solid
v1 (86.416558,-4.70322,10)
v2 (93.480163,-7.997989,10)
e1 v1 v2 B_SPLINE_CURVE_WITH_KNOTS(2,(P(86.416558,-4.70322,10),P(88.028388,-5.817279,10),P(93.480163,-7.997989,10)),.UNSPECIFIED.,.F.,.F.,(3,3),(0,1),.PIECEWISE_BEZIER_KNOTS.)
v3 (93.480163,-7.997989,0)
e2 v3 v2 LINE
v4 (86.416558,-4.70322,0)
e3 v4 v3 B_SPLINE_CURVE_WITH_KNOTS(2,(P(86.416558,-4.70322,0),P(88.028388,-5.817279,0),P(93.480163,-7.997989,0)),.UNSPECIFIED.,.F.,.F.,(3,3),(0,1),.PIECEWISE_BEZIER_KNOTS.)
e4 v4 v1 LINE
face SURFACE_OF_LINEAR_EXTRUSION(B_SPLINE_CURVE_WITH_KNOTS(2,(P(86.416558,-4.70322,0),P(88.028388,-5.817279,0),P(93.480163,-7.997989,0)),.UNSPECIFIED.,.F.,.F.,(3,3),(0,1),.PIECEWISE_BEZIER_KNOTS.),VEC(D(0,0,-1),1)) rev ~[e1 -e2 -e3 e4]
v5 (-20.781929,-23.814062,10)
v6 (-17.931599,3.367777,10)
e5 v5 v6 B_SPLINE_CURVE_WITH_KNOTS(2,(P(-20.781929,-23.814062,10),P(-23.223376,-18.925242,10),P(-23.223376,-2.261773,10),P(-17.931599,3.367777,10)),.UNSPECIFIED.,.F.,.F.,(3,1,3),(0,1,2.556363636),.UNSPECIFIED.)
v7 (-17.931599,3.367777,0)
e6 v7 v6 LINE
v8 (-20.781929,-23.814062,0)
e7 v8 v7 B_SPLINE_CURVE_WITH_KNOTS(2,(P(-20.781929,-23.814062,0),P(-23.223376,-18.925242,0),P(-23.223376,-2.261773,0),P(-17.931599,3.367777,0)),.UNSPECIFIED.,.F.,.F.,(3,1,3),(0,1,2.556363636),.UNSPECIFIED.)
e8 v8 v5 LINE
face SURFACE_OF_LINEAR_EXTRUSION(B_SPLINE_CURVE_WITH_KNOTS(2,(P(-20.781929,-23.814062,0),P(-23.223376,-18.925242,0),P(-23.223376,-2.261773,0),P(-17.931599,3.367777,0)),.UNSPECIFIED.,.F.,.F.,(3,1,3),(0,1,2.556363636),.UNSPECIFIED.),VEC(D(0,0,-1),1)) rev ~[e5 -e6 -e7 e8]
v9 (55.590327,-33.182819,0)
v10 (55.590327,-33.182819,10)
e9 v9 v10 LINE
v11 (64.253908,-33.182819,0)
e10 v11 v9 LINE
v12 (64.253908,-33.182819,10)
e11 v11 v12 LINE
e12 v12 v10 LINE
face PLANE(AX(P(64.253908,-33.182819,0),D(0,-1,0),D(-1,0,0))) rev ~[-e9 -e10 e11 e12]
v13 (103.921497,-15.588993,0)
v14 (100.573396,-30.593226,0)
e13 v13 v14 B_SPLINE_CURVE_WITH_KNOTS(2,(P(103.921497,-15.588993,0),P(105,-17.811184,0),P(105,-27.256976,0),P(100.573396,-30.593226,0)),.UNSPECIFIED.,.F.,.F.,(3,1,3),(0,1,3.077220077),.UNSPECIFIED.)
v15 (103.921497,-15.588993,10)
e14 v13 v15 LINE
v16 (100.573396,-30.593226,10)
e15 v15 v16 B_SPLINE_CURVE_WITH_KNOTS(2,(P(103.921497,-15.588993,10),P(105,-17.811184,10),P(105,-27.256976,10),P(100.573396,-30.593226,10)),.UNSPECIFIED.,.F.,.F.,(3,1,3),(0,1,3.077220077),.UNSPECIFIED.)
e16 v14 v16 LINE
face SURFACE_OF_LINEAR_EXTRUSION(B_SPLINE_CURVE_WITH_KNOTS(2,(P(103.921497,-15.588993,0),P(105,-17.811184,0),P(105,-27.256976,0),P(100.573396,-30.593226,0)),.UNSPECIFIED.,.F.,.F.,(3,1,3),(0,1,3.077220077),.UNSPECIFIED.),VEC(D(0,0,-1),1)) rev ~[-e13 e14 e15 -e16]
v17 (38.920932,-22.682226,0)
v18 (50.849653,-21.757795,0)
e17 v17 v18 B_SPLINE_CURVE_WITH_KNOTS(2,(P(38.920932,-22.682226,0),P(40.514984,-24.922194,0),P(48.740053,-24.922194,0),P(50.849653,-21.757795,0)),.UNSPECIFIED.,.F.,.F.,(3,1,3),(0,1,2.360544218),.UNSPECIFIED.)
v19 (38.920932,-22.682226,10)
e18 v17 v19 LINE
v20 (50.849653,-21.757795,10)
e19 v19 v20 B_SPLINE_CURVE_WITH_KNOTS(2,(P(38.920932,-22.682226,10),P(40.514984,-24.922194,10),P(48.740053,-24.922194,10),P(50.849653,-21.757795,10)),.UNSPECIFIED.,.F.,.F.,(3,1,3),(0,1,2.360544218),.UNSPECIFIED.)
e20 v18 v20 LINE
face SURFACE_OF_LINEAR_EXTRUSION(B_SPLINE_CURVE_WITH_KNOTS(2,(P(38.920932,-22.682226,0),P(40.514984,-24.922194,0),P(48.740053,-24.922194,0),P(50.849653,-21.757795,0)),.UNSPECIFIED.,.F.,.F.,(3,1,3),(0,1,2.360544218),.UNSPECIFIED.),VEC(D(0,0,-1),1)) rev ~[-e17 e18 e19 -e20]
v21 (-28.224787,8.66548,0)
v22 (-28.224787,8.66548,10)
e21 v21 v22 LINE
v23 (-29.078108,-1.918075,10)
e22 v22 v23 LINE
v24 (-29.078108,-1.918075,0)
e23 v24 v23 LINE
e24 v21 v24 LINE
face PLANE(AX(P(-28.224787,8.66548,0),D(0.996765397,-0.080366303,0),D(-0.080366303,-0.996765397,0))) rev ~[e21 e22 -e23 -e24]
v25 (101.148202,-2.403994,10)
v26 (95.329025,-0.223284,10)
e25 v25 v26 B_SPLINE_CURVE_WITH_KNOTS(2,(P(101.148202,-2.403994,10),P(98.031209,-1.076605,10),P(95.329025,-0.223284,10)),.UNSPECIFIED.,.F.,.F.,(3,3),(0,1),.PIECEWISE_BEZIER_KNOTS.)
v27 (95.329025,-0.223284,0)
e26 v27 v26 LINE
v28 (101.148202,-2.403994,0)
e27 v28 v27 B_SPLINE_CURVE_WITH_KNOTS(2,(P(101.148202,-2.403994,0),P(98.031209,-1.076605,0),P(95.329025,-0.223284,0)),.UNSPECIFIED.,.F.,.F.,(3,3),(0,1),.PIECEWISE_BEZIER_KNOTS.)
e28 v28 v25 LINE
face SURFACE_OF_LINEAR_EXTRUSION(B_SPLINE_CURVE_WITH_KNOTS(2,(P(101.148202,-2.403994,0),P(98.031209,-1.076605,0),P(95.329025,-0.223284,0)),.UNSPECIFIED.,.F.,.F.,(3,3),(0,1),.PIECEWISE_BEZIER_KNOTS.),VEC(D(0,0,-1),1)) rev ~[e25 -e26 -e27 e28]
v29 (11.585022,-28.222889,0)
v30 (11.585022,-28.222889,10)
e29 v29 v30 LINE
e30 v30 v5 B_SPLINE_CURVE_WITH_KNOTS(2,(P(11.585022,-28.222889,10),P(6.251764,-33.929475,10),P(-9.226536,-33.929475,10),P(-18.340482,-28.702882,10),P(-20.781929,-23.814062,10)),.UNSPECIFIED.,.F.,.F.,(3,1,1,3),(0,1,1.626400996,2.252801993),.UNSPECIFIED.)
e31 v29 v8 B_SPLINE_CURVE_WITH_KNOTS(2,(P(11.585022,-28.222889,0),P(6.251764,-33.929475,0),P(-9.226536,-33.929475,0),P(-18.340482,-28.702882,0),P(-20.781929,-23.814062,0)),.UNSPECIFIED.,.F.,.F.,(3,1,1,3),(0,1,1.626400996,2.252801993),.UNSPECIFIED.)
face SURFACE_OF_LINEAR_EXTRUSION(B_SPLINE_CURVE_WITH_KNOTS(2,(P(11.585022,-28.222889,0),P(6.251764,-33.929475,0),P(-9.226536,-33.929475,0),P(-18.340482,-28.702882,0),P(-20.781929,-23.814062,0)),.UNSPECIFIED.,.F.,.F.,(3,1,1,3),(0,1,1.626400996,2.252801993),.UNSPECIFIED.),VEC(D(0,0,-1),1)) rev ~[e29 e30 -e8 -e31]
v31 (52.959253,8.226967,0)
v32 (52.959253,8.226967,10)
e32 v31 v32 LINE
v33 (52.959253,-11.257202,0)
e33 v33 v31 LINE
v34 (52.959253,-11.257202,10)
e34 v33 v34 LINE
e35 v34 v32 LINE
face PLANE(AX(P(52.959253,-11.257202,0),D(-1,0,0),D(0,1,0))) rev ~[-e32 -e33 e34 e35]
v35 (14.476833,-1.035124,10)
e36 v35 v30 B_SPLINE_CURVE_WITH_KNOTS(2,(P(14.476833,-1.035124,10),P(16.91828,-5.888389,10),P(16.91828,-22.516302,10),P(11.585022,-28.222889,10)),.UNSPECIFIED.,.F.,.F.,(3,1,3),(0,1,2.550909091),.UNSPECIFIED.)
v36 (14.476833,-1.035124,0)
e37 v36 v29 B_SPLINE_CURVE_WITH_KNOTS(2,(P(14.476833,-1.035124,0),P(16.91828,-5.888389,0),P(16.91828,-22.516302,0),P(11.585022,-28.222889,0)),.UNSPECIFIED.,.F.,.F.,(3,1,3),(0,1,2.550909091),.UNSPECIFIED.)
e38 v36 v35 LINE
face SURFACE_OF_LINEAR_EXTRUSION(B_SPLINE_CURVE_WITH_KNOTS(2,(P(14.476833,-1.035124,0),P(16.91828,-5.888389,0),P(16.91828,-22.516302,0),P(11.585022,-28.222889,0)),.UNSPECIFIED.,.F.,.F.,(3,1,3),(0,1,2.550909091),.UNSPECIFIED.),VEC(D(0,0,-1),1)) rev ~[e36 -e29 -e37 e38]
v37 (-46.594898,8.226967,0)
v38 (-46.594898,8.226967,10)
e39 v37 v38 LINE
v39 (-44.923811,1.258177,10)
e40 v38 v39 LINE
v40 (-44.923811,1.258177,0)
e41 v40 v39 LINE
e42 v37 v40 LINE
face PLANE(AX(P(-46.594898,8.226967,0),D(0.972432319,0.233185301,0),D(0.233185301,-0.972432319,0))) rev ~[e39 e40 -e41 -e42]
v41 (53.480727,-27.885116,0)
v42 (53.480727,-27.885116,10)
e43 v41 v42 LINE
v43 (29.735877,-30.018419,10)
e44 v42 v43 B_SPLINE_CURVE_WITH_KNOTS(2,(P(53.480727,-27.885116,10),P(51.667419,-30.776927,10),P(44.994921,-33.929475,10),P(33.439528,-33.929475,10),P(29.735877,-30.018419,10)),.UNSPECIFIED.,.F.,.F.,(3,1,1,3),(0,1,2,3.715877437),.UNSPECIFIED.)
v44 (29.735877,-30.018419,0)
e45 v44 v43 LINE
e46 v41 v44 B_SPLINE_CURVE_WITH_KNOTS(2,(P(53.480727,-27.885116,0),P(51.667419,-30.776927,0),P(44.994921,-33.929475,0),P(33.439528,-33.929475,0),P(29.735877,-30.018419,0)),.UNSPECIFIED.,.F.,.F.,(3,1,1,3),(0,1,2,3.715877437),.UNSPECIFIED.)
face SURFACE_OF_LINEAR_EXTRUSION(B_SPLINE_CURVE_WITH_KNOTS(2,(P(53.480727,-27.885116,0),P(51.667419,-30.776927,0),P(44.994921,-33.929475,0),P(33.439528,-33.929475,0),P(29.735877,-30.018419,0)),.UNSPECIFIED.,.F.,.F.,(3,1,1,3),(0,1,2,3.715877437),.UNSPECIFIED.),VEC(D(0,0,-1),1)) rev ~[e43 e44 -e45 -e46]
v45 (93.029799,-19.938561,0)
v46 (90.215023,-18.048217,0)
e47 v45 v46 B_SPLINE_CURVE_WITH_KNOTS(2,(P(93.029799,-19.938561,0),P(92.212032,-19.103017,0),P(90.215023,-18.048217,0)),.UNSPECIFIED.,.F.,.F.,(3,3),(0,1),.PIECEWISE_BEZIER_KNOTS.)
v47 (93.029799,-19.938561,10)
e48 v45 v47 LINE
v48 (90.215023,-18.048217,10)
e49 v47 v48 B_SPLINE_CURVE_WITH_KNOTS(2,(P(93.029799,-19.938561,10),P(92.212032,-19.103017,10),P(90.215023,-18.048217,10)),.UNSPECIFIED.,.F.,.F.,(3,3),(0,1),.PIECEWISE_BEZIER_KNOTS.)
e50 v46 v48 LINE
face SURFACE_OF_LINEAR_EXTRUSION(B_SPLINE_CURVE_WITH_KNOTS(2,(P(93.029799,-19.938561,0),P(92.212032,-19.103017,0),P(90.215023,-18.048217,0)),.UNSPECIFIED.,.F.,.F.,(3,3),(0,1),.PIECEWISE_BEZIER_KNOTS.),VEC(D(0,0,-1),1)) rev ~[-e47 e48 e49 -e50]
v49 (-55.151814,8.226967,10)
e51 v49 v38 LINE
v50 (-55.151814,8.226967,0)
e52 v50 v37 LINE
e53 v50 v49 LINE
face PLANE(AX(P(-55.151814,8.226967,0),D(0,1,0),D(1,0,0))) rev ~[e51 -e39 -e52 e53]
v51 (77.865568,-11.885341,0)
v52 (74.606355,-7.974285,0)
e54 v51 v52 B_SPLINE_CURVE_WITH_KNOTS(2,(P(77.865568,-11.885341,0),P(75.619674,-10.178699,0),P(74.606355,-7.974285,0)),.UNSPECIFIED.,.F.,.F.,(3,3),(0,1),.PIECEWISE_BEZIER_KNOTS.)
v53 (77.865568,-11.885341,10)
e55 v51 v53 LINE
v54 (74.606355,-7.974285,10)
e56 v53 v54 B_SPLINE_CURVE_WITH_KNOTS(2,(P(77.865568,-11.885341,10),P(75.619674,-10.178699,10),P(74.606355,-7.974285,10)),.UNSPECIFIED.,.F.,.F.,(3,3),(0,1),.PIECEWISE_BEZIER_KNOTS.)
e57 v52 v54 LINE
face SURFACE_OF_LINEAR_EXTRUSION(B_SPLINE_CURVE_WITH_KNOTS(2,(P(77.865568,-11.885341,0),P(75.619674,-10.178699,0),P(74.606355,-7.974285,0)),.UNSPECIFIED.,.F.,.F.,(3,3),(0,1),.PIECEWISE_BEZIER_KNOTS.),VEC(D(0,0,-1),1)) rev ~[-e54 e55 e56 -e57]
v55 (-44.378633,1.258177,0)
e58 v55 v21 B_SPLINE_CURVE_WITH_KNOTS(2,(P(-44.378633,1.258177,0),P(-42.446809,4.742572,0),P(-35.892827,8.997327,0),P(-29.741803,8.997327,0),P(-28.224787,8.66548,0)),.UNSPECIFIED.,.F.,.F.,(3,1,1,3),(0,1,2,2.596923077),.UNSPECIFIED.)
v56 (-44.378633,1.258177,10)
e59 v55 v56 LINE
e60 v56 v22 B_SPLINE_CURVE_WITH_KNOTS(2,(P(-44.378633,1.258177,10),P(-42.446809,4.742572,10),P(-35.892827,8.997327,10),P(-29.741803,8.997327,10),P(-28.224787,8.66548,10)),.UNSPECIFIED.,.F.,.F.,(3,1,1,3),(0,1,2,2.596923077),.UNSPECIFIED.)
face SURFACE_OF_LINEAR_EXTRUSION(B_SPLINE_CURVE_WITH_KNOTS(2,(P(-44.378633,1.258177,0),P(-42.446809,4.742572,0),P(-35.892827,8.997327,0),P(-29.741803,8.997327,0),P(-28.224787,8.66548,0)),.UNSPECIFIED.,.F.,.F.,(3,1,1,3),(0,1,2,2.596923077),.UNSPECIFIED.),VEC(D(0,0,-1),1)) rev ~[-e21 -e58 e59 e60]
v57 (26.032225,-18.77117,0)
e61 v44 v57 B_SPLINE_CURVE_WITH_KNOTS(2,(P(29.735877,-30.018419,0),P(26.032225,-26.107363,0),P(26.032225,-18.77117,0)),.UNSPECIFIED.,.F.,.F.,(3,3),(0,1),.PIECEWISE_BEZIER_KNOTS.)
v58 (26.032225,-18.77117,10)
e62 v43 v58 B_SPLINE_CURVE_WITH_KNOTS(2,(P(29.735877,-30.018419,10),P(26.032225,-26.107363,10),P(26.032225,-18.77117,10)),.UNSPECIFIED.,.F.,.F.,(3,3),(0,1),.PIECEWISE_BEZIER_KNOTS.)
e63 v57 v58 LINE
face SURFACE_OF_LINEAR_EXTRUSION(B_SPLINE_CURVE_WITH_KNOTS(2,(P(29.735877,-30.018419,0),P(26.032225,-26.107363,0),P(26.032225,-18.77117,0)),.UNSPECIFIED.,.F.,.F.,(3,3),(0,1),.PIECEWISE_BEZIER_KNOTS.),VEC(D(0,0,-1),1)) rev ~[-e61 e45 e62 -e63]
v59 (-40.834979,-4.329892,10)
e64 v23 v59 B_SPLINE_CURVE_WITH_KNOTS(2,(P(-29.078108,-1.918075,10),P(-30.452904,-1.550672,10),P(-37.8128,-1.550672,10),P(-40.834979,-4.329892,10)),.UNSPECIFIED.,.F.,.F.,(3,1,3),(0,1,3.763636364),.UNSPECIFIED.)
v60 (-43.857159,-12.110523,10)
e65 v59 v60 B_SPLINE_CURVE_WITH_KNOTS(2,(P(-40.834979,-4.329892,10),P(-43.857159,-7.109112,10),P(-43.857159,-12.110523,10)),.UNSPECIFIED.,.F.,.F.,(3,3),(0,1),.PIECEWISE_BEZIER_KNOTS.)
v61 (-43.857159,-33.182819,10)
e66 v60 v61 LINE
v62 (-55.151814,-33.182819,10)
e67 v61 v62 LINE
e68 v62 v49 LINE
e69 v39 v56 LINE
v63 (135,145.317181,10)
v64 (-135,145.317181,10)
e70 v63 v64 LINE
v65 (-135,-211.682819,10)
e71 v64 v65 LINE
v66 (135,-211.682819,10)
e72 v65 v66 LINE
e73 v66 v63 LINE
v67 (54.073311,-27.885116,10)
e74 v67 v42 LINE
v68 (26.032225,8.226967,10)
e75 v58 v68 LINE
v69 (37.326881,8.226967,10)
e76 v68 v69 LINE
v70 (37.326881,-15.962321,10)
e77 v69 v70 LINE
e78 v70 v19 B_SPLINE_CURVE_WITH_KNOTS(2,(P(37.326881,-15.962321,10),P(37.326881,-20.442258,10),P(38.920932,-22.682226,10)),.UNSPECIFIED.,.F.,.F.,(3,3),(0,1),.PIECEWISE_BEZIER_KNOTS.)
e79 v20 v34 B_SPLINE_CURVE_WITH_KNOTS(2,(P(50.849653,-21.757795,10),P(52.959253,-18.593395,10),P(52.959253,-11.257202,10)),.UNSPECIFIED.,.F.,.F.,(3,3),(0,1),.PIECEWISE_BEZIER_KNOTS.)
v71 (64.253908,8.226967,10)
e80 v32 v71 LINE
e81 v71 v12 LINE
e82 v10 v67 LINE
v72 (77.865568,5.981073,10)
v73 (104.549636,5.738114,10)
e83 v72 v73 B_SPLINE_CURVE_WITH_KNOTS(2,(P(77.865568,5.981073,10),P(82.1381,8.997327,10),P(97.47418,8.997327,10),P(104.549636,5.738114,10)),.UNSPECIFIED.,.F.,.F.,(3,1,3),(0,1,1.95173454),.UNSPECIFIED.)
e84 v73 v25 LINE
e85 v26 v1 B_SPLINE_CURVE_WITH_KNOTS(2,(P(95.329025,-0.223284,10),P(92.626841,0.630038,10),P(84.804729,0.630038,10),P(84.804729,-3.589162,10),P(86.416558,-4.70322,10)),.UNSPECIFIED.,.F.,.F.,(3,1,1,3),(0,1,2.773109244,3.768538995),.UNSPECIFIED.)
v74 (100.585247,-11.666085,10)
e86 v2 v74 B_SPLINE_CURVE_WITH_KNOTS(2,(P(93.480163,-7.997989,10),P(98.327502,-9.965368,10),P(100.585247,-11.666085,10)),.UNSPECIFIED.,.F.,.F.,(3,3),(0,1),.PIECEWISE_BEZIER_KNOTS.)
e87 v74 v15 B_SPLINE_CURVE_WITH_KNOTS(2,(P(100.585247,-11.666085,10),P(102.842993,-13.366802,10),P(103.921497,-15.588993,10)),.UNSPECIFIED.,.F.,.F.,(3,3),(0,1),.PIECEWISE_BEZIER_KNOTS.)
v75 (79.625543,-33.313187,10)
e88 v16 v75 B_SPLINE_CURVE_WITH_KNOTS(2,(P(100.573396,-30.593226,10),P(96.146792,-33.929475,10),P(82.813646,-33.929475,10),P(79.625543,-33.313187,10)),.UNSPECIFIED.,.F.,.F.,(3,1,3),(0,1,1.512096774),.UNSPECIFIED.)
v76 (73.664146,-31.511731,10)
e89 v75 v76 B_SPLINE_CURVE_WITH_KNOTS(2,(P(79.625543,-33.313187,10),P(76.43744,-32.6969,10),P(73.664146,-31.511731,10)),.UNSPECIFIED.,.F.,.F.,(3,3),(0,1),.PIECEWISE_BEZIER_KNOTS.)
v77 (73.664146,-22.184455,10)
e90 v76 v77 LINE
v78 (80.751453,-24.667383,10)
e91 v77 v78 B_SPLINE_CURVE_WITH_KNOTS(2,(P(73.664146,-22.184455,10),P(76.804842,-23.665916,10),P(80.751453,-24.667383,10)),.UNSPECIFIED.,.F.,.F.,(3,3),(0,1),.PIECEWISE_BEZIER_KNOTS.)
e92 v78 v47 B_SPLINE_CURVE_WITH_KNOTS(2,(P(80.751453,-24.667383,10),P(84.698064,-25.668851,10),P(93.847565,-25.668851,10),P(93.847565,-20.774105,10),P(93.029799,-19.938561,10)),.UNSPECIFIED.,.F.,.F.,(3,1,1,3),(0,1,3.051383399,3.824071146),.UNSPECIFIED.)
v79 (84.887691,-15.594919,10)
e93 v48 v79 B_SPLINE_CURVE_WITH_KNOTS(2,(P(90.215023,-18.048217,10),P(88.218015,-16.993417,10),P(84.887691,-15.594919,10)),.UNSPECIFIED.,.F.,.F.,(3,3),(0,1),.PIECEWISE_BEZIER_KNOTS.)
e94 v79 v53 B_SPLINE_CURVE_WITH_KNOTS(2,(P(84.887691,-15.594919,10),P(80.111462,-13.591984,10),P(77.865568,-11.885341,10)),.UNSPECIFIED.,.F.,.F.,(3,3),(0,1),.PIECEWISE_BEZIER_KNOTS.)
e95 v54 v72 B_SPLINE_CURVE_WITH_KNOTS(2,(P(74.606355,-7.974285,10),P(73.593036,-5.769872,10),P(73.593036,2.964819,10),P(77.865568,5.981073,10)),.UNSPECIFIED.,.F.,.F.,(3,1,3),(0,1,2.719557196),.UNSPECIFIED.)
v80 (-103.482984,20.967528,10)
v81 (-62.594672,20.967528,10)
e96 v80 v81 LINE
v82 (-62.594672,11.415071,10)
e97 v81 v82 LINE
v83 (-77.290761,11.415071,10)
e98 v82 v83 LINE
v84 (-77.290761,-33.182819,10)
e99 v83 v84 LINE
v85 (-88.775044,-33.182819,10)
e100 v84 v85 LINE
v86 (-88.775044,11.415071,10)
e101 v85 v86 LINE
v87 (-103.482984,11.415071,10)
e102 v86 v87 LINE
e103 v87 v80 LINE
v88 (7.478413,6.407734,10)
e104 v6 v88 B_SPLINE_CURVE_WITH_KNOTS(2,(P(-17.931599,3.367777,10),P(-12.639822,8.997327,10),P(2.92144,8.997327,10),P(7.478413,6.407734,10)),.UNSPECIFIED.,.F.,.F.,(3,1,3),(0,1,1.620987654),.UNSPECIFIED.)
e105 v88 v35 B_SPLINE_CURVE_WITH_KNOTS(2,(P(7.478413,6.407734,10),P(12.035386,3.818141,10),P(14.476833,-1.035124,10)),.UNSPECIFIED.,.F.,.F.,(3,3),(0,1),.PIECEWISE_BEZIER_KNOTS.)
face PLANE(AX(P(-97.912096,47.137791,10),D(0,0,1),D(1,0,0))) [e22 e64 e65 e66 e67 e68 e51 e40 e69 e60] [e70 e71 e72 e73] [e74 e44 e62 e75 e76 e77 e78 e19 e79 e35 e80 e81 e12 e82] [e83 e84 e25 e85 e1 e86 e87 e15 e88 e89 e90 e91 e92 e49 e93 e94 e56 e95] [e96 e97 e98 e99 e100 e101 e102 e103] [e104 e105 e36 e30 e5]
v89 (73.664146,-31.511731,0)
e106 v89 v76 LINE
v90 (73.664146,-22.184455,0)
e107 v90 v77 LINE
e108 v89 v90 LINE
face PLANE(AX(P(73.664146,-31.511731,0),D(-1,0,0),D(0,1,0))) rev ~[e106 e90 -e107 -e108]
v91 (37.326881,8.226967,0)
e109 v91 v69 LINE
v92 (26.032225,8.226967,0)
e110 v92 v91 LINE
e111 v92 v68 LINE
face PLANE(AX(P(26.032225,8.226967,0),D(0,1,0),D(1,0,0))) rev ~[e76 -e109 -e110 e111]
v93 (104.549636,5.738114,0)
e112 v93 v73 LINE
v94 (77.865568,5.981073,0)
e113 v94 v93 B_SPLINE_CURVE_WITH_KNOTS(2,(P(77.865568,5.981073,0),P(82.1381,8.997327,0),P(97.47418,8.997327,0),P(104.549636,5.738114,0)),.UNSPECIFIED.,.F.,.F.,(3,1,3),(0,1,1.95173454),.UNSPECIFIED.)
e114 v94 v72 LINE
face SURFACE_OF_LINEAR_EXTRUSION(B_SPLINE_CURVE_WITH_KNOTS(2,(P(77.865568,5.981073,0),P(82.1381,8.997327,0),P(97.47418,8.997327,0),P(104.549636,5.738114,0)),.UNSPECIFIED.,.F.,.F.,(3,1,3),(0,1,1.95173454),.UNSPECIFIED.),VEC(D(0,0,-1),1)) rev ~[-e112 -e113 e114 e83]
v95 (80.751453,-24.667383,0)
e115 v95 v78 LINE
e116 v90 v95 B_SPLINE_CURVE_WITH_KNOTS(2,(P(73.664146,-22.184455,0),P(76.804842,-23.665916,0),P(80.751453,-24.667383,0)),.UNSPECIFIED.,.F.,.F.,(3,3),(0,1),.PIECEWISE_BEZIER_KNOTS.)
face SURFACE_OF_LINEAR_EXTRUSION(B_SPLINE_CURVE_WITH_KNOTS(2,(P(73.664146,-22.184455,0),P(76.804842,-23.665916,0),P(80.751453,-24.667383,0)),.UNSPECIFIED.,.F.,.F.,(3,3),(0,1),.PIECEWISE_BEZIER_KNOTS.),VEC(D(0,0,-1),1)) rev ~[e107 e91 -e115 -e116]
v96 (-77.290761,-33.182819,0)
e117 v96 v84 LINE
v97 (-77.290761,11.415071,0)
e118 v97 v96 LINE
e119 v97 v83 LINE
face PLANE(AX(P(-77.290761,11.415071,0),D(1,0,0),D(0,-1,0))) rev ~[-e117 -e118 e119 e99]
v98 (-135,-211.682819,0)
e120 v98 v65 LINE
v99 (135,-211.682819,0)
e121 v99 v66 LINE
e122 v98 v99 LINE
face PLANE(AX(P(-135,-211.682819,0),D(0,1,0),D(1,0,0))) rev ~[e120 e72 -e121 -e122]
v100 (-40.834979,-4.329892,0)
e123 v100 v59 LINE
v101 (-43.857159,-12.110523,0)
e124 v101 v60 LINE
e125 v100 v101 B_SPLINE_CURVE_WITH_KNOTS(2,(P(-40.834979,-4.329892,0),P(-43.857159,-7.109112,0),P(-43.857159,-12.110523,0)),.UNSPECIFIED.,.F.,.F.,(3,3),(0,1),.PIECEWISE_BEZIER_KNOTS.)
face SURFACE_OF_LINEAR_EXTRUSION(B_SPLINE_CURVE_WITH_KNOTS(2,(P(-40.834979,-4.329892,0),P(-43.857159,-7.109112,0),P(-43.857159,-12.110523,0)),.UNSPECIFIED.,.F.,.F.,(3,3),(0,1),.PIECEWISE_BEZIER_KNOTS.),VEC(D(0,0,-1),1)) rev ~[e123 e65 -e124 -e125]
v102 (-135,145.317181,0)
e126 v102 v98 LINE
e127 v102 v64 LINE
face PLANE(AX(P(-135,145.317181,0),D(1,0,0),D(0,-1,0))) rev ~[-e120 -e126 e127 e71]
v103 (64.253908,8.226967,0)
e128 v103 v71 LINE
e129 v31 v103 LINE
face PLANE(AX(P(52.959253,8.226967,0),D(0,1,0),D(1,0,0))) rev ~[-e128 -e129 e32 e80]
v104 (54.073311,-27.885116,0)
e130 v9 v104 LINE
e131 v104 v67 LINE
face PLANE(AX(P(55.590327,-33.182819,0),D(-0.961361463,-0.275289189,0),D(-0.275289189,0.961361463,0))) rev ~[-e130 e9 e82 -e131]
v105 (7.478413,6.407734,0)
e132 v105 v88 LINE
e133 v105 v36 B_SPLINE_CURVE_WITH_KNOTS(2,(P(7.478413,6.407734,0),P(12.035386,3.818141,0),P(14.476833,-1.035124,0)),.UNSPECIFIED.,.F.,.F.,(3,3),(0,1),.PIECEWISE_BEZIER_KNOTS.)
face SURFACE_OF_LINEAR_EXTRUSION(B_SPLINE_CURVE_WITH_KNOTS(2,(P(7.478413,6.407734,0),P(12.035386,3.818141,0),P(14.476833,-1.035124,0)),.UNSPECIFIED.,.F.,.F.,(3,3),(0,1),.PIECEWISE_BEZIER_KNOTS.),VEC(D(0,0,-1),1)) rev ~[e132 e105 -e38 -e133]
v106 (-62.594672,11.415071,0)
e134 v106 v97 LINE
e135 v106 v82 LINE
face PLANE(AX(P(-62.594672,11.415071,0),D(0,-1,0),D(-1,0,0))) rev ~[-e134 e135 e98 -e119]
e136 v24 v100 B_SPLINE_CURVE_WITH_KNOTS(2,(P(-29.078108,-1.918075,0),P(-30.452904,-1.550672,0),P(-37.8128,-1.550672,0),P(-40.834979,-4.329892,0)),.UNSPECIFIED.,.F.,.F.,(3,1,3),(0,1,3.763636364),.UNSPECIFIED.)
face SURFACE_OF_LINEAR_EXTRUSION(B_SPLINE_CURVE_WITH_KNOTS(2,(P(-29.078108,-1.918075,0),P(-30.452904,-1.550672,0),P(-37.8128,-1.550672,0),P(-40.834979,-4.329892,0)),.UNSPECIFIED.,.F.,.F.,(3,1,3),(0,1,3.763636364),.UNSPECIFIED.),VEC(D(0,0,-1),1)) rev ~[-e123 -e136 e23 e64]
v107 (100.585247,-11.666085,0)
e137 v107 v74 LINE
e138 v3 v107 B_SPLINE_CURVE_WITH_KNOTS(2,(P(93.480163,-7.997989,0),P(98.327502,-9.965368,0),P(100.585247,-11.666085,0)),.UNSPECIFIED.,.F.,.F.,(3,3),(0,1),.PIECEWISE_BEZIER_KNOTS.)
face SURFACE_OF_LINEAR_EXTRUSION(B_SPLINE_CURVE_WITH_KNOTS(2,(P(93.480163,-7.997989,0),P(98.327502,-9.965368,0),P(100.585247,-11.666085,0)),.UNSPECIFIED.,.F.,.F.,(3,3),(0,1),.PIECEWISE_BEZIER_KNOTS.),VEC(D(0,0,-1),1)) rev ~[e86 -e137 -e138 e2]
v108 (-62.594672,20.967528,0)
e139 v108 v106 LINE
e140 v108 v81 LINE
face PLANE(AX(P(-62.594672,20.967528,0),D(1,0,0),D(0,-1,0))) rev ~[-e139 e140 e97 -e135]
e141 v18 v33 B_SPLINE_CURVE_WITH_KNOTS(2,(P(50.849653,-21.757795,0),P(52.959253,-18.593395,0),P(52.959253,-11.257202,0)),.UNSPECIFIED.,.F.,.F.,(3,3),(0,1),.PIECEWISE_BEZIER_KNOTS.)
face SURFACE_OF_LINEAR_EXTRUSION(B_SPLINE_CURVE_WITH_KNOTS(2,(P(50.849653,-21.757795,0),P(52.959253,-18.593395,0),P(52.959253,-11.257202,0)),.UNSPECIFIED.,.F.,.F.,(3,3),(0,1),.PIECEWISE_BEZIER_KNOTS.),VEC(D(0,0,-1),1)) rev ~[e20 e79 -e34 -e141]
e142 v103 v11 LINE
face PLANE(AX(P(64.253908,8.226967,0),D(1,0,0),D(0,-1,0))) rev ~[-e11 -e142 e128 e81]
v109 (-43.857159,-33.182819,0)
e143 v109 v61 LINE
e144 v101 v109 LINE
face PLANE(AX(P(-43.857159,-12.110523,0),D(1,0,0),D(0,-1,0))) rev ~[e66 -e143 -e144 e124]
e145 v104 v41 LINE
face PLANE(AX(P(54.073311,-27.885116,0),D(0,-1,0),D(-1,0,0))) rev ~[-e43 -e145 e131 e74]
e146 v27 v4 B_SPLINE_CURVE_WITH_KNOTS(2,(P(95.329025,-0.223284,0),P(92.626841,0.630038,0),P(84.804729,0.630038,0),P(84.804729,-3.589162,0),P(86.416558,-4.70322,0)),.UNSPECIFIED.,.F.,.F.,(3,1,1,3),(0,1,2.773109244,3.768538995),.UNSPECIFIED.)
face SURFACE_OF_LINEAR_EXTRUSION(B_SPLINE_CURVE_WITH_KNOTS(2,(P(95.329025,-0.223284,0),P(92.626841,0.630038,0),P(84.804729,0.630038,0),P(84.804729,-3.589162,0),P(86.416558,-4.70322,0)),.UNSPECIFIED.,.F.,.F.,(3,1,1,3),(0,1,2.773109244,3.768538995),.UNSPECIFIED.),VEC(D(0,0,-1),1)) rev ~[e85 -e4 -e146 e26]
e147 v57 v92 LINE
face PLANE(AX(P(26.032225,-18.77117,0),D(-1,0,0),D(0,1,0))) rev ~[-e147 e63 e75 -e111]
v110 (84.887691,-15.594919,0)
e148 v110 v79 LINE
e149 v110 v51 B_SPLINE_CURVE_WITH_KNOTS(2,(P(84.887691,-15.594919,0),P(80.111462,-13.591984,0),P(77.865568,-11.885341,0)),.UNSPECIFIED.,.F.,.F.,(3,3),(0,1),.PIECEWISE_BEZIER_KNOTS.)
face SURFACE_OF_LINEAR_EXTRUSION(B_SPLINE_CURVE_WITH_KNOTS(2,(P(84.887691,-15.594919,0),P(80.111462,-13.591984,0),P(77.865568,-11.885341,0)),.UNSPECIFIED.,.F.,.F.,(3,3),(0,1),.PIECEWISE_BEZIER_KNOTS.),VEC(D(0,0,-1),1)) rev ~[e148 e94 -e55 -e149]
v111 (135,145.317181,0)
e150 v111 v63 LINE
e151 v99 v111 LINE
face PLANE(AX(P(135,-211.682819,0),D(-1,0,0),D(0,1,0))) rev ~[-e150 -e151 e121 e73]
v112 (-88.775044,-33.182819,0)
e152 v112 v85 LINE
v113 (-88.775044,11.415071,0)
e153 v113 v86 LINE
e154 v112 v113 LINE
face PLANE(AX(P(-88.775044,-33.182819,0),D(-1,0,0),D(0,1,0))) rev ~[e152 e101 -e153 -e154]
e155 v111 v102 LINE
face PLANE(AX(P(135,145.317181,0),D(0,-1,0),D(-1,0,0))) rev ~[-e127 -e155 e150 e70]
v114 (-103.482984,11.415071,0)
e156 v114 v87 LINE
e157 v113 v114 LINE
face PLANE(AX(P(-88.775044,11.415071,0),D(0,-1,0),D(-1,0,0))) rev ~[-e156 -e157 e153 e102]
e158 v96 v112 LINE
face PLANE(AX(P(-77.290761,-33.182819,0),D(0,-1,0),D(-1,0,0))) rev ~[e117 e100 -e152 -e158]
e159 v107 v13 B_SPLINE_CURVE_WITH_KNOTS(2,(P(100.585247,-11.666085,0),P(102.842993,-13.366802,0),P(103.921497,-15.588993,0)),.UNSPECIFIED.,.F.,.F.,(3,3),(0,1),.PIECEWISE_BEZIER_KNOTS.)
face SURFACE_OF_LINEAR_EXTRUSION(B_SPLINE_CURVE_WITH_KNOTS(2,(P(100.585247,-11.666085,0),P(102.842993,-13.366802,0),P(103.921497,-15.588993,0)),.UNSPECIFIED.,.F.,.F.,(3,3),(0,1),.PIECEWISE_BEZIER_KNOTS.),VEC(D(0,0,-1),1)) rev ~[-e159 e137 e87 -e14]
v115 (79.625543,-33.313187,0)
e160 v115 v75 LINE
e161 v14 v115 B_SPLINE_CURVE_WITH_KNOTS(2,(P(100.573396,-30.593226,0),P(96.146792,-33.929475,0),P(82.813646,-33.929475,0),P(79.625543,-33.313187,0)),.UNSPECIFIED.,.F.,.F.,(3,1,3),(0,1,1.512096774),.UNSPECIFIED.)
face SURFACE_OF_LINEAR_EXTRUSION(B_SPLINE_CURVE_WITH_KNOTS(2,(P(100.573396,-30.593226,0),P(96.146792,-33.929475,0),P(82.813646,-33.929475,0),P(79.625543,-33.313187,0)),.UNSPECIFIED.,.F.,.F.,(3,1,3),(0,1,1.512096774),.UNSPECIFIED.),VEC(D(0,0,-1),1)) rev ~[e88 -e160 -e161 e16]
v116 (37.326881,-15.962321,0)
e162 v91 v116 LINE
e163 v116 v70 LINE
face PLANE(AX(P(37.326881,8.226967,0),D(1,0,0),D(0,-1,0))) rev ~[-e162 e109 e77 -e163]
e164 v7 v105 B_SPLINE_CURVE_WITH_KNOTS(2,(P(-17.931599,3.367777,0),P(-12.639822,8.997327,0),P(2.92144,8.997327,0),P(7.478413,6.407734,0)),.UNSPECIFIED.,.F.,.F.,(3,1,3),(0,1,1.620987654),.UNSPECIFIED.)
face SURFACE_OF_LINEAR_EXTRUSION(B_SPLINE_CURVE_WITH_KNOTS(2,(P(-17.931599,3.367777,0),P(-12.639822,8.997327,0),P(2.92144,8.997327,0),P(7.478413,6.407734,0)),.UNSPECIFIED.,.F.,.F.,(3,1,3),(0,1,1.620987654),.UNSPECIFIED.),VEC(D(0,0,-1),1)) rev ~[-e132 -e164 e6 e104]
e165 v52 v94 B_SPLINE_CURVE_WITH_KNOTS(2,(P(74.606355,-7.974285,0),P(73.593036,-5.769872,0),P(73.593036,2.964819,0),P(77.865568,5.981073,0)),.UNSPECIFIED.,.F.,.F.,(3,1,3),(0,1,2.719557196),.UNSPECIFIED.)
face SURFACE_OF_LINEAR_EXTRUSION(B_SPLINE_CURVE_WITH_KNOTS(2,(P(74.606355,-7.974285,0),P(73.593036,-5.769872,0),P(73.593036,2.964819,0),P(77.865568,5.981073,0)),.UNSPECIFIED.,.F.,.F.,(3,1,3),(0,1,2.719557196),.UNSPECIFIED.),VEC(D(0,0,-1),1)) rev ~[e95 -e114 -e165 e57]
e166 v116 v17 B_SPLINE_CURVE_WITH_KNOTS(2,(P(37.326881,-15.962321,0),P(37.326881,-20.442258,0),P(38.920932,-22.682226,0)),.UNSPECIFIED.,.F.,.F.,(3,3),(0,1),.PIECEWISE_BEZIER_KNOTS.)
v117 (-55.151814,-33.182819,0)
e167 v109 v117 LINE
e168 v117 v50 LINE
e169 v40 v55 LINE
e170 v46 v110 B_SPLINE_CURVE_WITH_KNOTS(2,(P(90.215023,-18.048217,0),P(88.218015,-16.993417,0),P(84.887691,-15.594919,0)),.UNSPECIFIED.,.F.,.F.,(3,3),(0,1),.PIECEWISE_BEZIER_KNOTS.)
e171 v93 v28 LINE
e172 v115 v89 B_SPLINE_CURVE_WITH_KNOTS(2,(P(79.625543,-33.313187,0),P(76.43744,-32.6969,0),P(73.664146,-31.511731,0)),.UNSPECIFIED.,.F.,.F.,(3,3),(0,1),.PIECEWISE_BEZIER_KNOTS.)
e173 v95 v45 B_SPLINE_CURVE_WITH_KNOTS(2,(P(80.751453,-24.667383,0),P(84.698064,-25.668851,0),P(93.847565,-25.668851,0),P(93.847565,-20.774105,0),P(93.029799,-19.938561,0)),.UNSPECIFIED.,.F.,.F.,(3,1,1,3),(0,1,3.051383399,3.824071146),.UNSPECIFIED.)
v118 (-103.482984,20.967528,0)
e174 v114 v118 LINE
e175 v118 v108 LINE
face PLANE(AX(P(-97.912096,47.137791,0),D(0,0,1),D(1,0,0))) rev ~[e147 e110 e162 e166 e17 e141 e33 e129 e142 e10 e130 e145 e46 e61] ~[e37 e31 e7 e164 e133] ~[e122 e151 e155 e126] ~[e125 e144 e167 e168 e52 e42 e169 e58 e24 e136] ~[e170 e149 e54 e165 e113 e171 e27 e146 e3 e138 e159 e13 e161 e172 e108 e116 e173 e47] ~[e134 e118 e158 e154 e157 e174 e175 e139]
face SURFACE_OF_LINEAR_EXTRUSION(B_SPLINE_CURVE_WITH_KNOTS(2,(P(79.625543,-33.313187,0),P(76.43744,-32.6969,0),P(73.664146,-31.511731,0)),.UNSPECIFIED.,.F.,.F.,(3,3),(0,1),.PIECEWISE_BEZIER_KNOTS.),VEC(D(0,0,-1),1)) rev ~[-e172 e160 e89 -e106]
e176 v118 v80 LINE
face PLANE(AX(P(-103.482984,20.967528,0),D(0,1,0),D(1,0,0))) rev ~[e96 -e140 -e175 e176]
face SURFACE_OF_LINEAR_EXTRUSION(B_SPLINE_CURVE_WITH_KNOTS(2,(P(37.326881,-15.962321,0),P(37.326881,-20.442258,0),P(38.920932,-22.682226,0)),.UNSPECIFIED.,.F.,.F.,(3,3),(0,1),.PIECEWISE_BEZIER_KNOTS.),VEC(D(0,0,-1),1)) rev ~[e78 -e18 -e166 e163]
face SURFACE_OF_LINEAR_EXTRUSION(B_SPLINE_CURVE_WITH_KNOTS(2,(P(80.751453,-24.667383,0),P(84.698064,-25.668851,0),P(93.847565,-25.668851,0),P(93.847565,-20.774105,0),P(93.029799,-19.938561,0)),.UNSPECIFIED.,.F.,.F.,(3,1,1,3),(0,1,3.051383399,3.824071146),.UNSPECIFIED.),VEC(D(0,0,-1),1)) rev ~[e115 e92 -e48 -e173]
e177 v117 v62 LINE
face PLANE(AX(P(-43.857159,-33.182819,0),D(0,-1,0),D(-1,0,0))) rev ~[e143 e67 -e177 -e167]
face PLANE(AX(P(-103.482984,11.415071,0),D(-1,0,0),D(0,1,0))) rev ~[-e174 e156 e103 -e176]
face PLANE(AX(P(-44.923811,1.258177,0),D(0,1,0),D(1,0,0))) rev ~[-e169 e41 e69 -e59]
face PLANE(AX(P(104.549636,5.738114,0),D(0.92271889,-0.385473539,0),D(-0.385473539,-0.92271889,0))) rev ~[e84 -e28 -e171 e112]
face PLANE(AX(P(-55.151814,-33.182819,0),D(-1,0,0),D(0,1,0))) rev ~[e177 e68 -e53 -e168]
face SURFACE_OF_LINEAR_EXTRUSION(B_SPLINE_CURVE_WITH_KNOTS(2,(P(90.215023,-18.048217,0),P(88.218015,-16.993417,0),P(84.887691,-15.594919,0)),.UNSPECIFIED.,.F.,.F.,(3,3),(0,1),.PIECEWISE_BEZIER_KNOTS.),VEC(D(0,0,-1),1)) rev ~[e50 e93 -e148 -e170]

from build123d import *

# Parameters (mm, degrees)
F1_DEPTH = 10


# Not quite as in the source:
# - a feature names something its author has since deleted; it is built from what else it names


with BuildPart() as f1:
    # F0 (on Top) → F1 (new body)
    with BuildSketch(Plane.XY):
        Polygon((-135, 145.3171813515), (-135, -111.8657903795), (-105, -111.8657903795), (-105, 115.3171813515), (0, 115.3171813515), (0, 145.3171813515), align=None)
        Polygon((81.1492523154, -181.6828186485), (81.1492523154, -211.6828186485), (135, -211.6828186485), (135, -33.1828186485), (105, -33.1828186485), (105, -181.6828186485), align=None)
        Polygon((105, -33.1828186485), (135, -33.1828186485), (135, 145.3171813515), (0, 145.3171813515), (0, 115.3171813515), (105, 115.3171813515), (105, -20.8807700001), align=None)
        Polygon((-135, -111.8657903795), (-135, -211.6828186485), (81.1492523154, -211.6828186485), (81.1492523154, -181.6828186485), (-105, -181.6828186485), (-105, -111.8657903795), align=None)
        Polygon((-105, -181.6828186485), (81.1492523154, -181.6828186485), (105, -181.6828186485), (105, -33.1828186485), (105, -20.8807700001), (105, 115.3171813515), (0, 115.3171813515), (-105, 115.3171813515), (-105, -111.8657903795), align=None)
        Polygon((-77.2907613296, 11.4150706229), (-77.2907613296, -33.1828186485), (-88.7750437384, -33.1828186485), (-88.7750437384, 11.4150706229), (-103.4829843671, 11.4150706229), (-103.4829843671, 20.9675284366), (-62.5946723856, 20.9675284366), (-62.5946723856, 11.4150706229), align=None, mode=Mode.SUBTRACT)
        with BuildLine():
            add(Edge.make_bspline(
                [(-39.1698177098, 6.8699495664), (-35.892826909, 8.9973269579), (-32.0410294035, 8.9973269579)],
                knots=[0, 0, 0, 1, 1, 1], degree=2))
            add(Edge.make_bspline(
                [(-32.0410294035, 8.9973269579), (-29.7418025848, 8.9973269579), (-28.2247869519, 8.6654797882)],
                knots=[0, 0, 0, 1, 1, 1], degree=2))
            Line((-28.2247869519, 8.6654797882), (-29.0781082454, -1.9180745884))
            add(Edge.make_bspline(
                [(-29.0781082454, -1.9180745884), (-30.4529036627, -1.5506723648), (-32.4084316271, -1.5506723648)],
                knots=[0, 0, 0, 1, 1, 1], degree=2))
            add(Edge.make_bspline(
                [(-32.4084316271, -1.5506723648), (-37.8127998194, -1.5506723648), (-40.8349794006, -4.3298924111)],
                knots=[0, 0, 0, 1, 1, 1], degree=2))
            add(Edge.make_bspline(
                [(-40.8349794006, -4.3298924111), (-43.8571589819, -7.1091124574), (-43.8571589819, -12.1105233722)],
                knots=[0, 0, 0, 1, 1, 1], degree=2))
            Line((-43.8571589819, -12.1105233722), (-43.8571589819, -33.1828186485))
            Line((-43.8571589819, -33.1828186485), (-55.1518144365, -33.1828186485))
            Line((-55.1518144365, -33.1828186485), (-55.1518144365, 8.2269674568))
            Line((-55.1518144365, 8.2269674568), (-46.5948981319, 8.2269674568))
            Line((-46.5948981319, 8.2269674568), (-44.9238105988, 1.258176893))
            Line((-44.9238105988, 1.258176893), (-44.3786331057, 1.258176893))
            add(Edge.make_bspline(
                [(-44.3786331057, 1.258176893), (-42.4468085106, 4.7425721749), (-39.1698177098, 6.8699495664)],
                knots=[0, 0, 0, 1, 1, 1], degree=2))
        make_face(mode=Mode.SUBTRACT)
        with BuildLine():
            add(Edge.make_bspline(
                [(14.4768327784, -1.0351240833), (16.9182798126, -5.8883889403), (16.9182798126, -12.406815488)],
                knots=[0, 0, 0, 1, 1, 1], degree=2))
            add(Edge.make_bspline(
                [(16.9182798126, -12.406815488), (16.9182798126, -22.5163024794), (11.5850217281, -28.2228886299)],
                knots=[0, 0, 0, 1, 1, 1], degree=2))
            add(Edge.make_bspline(
                [(11.5850217281, -28.2228886299), (6.2517636435, -33.9294747803), (-3.2651391162, -33.9294747803)],
                knots=[0, 0, 0, 1, 1, 1], degree=2))
            add(Edge.make_bspline(
                [(-3.2651391162, -33.9294747803), (-9.2265364863, -33.9294747803), (-13.7835092274, -31.3161783189)],
                knots=[0, 0, 0, 1, 1, 1], degree=2))
            add(Edge.make_bspline(
                [(-13.7835092274, -31.3161783189), (-18.3404819685, -28.7028818575), (-20.7819290028, -23.8140619466)],
                knots=[0, 0, 0, 1, 1, 1], degree=2))
            add(Edge.make_bspline(
                [(-20.7819290028, -23.8140619466), (-23.223376037, -18.9252420358), (-23.223376037, -12.406815488)],
                knots=[0, 0, 0, 1, 1, 1], degree=2))
            add(Edge.make_bspline(
                [(-23.223376037, -12.406815488), (-23.223376037, -2.2617734428), (-17.9315988487, 3.3677767576)],
                knots=[0, 0, 0, 1, 1, 1], degree=2))
            add(Edge.make_bspline(
                [(-17.9315988487, 3.3677767576), (-12.6398216604, 8.9973269579), (-3.0399571082, 8.9973269579)],
                knots=[0, 0, 0, 1, 1, 1], degree=2))
            add(Edge.make_bspline(
                [(-3.0399571082, 8.9973269579), (2.9214402619, 8.9973269579), (7.478413003, 6.4077338658)],
                knots=[0, 0, 0, 1, 1, 1], degree=2))
            add(Edge.make_bspline(
                [(7.478413003, 6.4077338658), (12.0353857441, 3.8181407736), (14.4768327784, -1.0351240833)],
                knots=[0, 0, 0, 1, 1, 1], degree=2))
        make_face(mode=Mode.SUBTRACT)
        with BuildLine():
            Line((64.2539082341, -33.1828186485), (55.5903267679, -33.1828186485))
            Line((55.5903267679, -33.1828186485), (54.0733111349, -27.8851156178))
            Line((54.0733111349, -27.8851156178), (53.4807269033, -27.8851156178))
            add(Edge.make_bspline(
                [(53.4807269033, -27.8851156178), (51.6674191546, -30.7769266681), (48.3311699306, -32.3532007242)],
                knots=[0, 0, 0, 1, 1, 1], degree=2))
            add(Edge.make_bspline(
                [(48.3311699306, -32.3532007242), (44.9949207066, -33.9294747803), (40.7401659236, -33.9294747803)],
                knots=[0, 0, 0, 1, 1, 1], degree=2))
            add(Edge.make_bspline(
                [(40.7401659236, -33.9294747803), (33.4395281901, -33.9294747803), (29.7358767425, -30.0184188517)],
                knots=[0, 0, 0, 1, 1, 1], degree=2))
            add(Edge.make_bspline(
                [(29.7358767425, -30.0184188517), (26.0322252949, -26.107362923), (26.0322252949, -18.7711701356)],
                knots=[0, 0, 0, 1, 1, 1], degree=2))
            Line((26.0322252949, -18.7711701356), (26.0322252949, 8.2269674568))
            Line((26.0322252949, 8.2269674568), (37.3268807495, 8.2269674568))
            Line((37.3268807495, 8.2269674568), (37.3268807495, -15.9623208777))
            add(Edge.make_bspline(
                [(37.3268807495, -15.9623208777), (37.3268807495, -20.4422576688), (38.9209323325, -22.6822260643)],
                knots=[0, 0, 0, 1, 1, 1], degree=2))
            add(Edge.make_bspline(
                [(38.9209323325, -22.6822260643), (40.5149839156, -24.9221944598), (43.9993791975, -24.9221944598)],
                knots=[0, 0, 0, 1, 1, 1], degree=2))
            add(Edge.make_bspline(
                [(43.9993791975, -24.9221944598), (48.7400530504, -24.9221944598), (50.8496529149, -21.7577946629)],
                knots=[0, 0, 0, 1, 1, 1], degree=2))
            add(Edge.make_bspline(
                [(50.8496529149, -21.7577946629), (52.9592527795, -18.5933948661), (52.9592527795, -11.2572020787)],
                knots=[0, 0, 0, 1, 1, 1], degree=2))
            Line((52.9592527795, -11.2572020787), (52.9592527795, 8.2269674568))
            Line((52.9592527795, 8.2269674568), (64.2539082341, 8.2269674568))
            Line((64.2539082341, 8.2269674568), (64.2539082341, -33.1828186485))
        make_face(mode=Mode.SUBTRACT)
        with BuildLine():
            add(Edge.make_bspline(
                [(103.9214966985, -15.5889928118), (105, -17.8111836804), (105, -20.8807700001)],
                knots=[0, 0, 0, 1, 1, 1], degree=2))
            add(Edge.make_bspline(
                [(105, -20.8807700001), (105, -27.2569763323), (100.5733957898, -30.5932255563)],
                knots=[0, 0, 0, 1, 1, 1], degree=2))
            add(Edge.make_bspline(
                [(100.5733957898, -30.5932255563), (96.1467915797, -33.9294747803), (87.3291382132, -33.9294747803)],
                knots=[0, 0, 0, 1, 1, 1], degree=2))
            add(Edge.make_bspline(
                [(87.3291382132, -33.9294747803), (82.8136463683, -33.9294747803), (79.6255432022, -33.3131871794)],
                knots=[0, 0, 0, 1, 1, 1], degree=2))
            add(Edge.make_bspline(
                [(79.6255432022, -33.3131871794), (76.4374400361, -32.6968995786), (73.6641458322, -31.5117311153)],
                knots=[0, 0, 0, 1, 1, 1], degree=2))
            Line((73.6641458322, -31.5117311153), (73.6641458322, -22.1844553097))
            add(Edge.make_bspline(
                [(73.6641458322, -22.1844553097), (76.8048422597, -23.6659158887), (80.7514532423, -24.6673832402)],
                knots=[0, 0, 0, 1, 1, 1], degree=2))
            add(Edge.make_bspline(
                [(80.7514532423, -24.6673832402), (84.6980642248, -25.6688505916), (87.6965404368, -25.6688505916)],
                knots=[0, 0, 0, 1, 1, 1], degree=2))
            add(Edge.make_bspline(
                [(87.6965404368, -25.6688505916), (93.847564761, -25.6688505916), (93.847564761, -22.1133452019)],
                knots=[0, 0, 0, 1, 1, 1], degree=2))
            add(Edge.make_bspline(
                [(93.847564761, -22.1133452019), (93.847564761, -20.7741048385), (93.0297985214, -19.9385610719)],
                knots=[0, 0, 0, 1, 1, 1], degree=2))
            add(Edge.make_bspline(
                [(93.0297985214, -19.9385610719), (92.2120322817, -19.1030173053), (90.2150234212, -18.048217373)],
                knots=[0, 0, 0, 1, 1, 1], degree=2))
            add(Edge.make_bspline(
                [(90.2150234212, -18.048217373), (88.2180145606, -16.9934174408), (84.887691179, -15.5949186541)],
                knots=[0, 0, 0, 1, 1, 1], degree=2))
            add(Edge.make_bspline(
                [(84.887691179, -15.5949186541), (80.1114622721, -13.5919839513), (77.8655680343, -11.8853413642)],
                knots=[0, 0, 0, 1, 1, 1], degree=2))
            add(Edge.make_bspline(
                [(77.8655680343, -11.8853413642), (75.6196737965, -10.1786987772), (74.6063547604, -7.9742854356)],
                knots=[0, 0, 0, 1, 1, 1], degree=2))
            add(Edge.make_bspline(
                [(74.6063547604, -7.9742854356), (73.5930357244, -5.7698720939), (73.5930357244, -2.5580655586)],
                knots=[0, 0, 0, 1, 1, 1], degree=2))
            add(Edge.make_bspline(
                [(73.5930357244, -2.5580655586), (73.5930357244, 2.9648194801), (77.8655680343, 5.981073219)],
                knots=[0, 0, 0, 1, 1, 1], degree=2))
            add(Edge.make_bspline(
                [(77.8655680343, 5.981073219), (82.1381003443, 8.9973269579), (89.9957672555, 8.9973269579)],
                knots=[0, 0, 0, 1, 1, 1], degree=2))
            add(Edge.make_bspline(
                [(89.9957672555, 8.9973269579), (97.4741802585, 8.9973269579), (104.549635984, 5.738113684)],
                knots=[0, 0, 0, 1, 1, 1], degree=2))
            Line((104.549635984, 5.738113684), (101.1482024945, -2.4039936584))
            add(Edge.make_bspline(
                [(101.1482024945, -2.4039936584), (98.0312094362, -1.0766049796), (95.32902534, -0.223283686)],
                knots=[0, 0, 0, 1, 1, 1], degree=2))
            add(Edge.make_bspline(
                [(95.32902534, -0.223283686), (92.6268412439, 0.6300376075), (89.8061403014, 0.6300376075)],
                knots=[0, 0, 0, 1, 1, 1], degree=2))
            add(Edge.make_bspline(
                [(89.8061403014, 0.6300376075), (84.8047293865, 0.6300376075), (84.8047293865, -2.0721464887)],
                knots=[0, 0, 0, 1, 1, 1], degree=2))
            add(Edge.make_bspline(
                [(84.8047293865, -2.0721464887), (84.8047293865, -3.5891621216), (86.4165584965, -4.703220477)],
                knots=[0, 0, 0, 1, 1, 1], degree=2))
            add(Edge.make_bspline(
                [(86.4165584965, -4.703220477), (88.0283876065, -5.8172788325), (93.4801625374, -7.9979888048)],
                knots=[0, 0, 0, 1, 1, 1], degree=2))
            add(Edge.make_bspline(
                [(93.4801625374, -7.9979888048), (98.327501552, -9.9653684538), (100.5852474745, -11.6660851985)],
                knots=[0, 0, 0, 1, 1, 1], degree=2))
            add(Edge.make_bspline(
                [(100.5852474745, -11.6660851985), (102.8429933969, -13.3668019433), (103.9214966985, -15.5889928118)],
                knots=[0, 0, 0, 1, 1, 1], degree=2))
        make_face(mode=Mode.SUBTRACT)
    extrude(amount=F1_DEPTH)


solid = f1.part
